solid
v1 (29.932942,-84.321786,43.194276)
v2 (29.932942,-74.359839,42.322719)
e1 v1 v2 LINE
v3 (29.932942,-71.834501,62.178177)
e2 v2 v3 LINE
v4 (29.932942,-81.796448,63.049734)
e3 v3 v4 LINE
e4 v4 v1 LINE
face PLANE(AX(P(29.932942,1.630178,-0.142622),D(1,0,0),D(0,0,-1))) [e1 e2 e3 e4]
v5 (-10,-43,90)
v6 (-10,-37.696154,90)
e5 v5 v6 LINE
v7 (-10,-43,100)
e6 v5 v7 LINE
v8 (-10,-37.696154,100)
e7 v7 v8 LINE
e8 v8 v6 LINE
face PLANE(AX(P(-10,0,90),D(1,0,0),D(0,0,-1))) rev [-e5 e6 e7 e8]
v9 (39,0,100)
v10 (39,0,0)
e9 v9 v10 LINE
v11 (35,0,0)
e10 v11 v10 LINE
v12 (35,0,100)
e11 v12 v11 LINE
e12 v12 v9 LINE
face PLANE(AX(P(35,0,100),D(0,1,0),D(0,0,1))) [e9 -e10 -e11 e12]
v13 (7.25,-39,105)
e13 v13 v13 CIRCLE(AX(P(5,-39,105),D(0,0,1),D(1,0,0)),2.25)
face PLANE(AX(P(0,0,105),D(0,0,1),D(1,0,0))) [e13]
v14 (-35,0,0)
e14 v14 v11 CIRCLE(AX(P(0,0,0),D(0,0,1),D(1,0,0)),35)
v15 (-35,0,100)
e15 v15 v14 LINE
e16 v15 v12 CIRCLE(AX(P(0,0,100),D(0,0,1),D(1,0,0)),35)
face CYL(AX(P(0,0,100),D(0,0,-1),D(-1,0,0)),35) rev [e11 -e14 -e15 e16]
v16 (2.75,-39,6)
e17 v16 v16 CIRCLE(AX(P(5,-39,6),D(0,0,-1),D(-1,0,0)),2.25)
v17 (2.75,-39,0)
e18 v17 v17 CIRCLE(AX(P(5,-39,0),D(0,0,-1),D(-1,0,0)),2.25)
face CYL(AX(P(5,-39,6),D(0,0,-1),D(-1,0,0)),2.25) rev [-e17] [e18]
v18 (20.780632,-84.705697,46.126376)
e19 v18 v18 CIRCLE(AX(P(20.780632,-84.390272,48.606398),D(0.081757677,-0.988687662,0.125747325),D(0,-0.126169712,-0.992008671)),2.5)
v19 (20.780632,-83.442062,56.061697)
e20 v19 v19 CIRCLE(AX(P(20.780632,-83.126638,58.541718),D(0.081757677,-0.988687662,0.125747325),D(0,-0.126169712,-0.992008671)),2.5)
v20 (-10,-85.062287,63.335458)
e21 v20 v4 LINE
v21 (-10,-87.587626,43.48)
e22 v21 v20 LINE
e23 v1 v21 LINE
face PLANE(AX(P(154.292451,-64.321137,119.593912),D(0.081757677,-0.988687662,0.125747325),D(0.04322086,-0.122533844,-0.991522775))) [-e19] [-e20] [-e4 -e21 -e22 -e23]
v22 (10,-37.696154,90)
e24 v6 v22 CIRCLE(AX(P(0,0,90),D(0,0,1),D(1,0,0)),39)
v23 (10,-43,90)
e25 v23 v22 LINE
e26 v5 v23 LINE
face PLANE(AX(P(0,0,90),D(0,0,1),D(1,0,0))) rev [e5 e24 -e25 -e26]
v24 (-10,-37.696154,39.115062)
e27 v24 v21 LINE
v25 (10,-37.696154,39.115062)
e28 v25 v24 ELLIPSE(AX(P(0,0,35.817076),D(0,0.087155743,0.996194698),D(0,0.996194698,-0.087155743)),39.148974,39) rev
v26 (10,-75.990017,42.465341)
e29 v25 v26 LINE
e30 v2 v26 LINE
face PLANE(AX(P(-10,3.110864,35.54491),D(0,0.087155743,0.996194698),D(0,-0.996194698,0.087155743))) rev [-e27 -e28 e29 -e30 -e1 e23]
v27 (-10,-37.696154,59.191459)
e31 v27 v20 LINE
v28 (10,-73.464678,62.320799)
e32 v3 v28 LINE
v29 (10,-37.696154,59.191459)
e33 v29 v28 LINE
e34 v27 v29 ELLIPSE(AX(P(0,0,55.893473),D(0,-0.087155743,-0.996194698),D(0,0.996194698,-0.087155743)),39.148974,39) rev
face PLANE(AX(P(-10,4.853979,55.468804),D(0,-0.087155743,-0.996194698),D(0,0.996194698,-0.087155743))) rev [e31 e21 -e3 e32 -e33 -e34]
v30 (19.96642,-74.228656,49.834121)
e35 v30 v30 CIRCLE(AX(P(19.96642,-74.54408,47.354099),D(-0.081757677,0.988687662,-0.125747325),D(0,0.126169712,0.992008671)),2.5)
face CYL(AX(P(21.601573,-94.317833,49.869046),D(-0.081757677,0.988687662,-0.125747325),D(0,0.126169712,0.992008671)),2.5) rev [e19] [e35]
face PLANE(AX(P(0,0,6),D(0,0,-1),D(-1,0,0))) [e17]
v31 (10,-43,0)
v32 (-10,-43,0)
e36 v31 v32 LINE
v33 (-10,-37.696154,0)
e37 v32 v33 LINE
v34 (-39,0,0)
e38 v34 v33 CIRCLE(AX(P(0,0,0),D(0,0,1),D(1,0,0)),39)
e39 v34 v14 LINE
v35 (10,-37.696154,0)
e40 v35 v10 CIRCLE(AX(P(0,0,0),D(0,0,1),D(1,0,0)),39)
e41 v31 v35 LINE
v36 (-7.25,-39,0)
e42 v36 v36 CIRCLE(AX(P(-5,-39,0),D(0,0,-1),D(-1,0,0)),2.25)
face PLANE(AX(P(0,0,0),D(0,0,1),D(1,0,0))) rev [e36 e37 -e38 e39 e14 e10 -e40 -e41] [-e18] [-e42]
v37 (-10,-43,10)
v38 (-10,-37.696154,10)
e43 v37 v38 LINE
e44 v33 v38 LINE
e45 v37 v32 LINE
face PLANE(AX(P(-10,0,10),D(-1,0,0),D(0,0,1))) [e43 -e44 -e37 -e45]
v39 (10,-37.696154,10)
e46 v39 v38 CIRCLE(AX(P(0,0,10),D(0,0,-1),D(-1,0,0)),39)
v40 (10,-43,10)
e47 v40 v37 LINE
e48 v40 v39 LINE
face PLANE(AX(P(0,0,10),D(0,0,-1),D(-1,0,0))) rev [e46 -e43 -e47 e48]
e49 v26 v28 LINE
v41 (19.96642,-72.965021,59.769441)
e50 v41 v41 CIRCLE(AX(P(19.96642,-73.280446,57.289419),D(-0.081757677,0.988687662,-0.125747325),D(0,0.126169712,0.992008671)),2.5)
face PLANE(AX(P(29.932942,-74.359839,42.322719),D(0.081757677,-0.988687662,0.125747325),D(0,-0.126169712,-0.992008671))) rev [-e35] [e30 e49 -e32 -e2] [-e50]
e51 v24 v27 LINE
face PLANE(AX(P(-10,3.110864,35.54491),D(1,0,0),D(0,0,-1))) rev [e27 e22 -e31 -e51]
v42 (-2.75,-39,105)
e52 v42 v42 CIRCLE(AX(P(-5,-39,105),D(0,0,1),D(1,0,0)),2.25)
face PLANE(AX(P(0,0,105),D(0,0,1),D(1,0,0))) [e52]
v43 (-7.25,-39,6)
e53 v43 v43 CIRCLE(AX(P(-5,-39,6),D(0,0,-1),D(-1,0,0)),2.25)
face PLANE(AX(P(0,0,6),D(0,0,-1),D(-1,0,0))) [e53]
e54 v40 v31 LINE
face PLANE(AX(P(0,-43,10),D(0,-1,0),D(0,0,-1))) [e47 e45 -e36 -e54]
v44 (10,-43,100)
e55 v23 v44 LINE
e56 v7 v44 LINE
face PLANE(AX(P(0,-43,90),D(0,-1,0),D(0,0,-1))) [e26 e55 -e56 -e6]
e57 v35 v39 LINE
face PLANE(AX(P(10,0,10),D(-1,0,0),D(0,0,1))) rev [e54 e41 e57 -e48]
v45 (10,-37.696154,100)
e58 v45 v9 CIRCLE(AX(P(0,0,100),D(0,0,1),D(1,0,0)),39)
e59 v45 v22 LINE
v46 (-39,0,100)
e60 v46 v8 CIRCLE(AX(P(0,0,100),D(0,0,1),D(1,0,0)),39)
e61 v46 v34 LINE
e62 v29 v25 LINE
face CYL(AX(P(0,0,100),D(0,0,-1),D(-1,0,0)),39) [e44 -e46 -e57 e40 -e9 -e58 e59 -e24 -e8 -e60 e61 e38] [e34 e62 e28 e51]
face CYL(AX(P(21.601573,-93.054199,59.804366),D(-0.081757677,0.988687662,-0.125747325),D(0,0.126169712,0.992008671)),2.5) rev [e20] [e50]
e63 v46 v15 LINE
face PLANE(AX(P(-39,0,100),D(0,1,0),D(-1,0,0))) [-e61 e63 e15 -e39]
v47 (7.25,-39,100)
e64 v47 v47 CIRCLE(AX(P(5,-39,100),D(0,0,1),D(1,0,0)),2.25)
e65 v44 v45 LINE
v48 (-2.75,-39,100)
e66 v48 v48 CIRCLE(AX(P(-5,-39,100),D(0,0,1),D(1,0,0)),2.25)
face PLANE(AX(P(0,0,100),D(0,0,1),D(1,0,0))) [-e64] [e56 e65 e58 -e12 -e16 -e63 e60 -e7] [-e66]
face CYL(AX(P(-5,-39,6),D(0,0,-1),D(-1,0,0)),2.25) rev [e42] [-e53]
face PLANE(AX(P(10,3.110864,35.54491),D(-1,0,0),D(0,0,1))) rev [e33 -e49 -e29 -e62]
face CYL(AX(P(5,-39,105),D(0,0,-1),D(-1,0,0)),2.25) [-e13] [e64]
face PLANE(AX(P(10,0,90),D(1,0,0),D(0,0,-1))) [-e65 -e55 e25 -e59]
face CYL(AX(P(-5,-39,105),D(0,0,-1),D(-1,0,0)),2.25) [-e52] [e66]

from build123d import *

# Parameters (mm, degrees)
EXTRUDE_THIN1_DEPTH       = 100
BOSS_EXTRUDE1_START       = -10
BOSS_EXTRUDE1_DEPTH       = 10
SKETCH3_R                 = 2.25
BOSS_EXTRUDE2_DEPTH       = 5
BOSS_EXTRUDE3_DEPTH       = 10
SKETCH5_R                 = 2.25
CUT_EXTRUDE1_DEPTH        = 6
BOSS_EXTRUDE4_REACH       = 121.416
BOSS_EXTRUDE4_END_RADIUS  = 39
SKETCH10_W                = 20
SKETCH10_H                = 20
BOSS_EXTRUDE5_START       = -39.491913729
BOSS_EXTRUDE5_OUTLINE_W   = 20
BOSS_EXTRUDE5_OUTLINE_H   = 20
BOSS_EXTRUDE5_DEPTH       = 39.491913729
BOSS_EXTRUDE5_START_2     = 91.246721786
BOSS_EXTRUDE5_2_OUTLINE_W = 23
BOSS_EXTRUDE5_2_OUTLINE_H = 23
BOSS_EXTRUDE5_2_DEPTH     = 3.753278214
BOSS_EXTRUDE6_DEPTH       = 20
SKETCH12_R                = 2.5
CUT_EXTRUDE2_DEPTH        = 20


with BuildPart() as part:
    # Sketch1 → Extrude-Thin1 (new body)
    with BuildSketch(Plane.XY):
        with BuildLine():
            ThreePointArc((-35, 0), (0, -35), (35, 0))
            Line((35, 0), (39, 0))
            ThreePointArc((39, 0), (0, -39), (-39, 0))
            Line((-39, 0), (-35, 0))
        make_face()
    extrude(amount=EXTRUDE_THIN1_DEPTH)

    # Sketch2 → Boss-Extrude1 (add)
    with BuildSketch(Plane.XY.offset(100).offset(BOSS_EXTRUDE1_START)):
        with BuildLine():
            Line((0, -39), (0, -35))
            Line((0, -35), (-10, -35))
            Line((-10, -35), (-10, -37.69615365))
            ThreePointArc((-10, -37.69615365), (-5.042321274, -38.672664715), (0, -39))
        make_face()
        with BuildLine():
            Line((10, -35), (0, -35))
            Line((0, -35), (0, -39))
            ThreePointArc((0, -39), (5.042321274, -38.672664715), (10, -37.69615365))
            Line((10, -37.69615365), (10, -35))
        make_face()
        with BuildLine():
            ThreePointArc((10, -37.69615365), (5.042321274, -38.672664715), (0, -39))
            ThreePointArc((0, -39), (-5.042321274, -38.672664715), (-10, -37.69615365))
            Line((-10, -37.69615365), (-10, -43))
            Line((-10, -43), (10, -43))
            Line((10, -43), (10, -37.69615365))
        make_face()
    extrude(amount=BOSS_EXTRUDE1_DEPTH)

    # Sketch3 → Boss-Extrude2 (add)
    with BuildSketch(Plane.XY.offset(100)):
        with Locations((-5, -39)):
            Circle(SKETCH3_R)
        with Locations((5, -39)):
            Circle(SKETCH3_R)
    extrude(amount=BOSS_EXTRUDE2_DEPTH)

    # Sketch4 → Boss-Extrude3 (add)
    with BuildSketch(Plane(origin=(0, 0, 0), x_dir=(-1, 0, 0), z_dir=(0, 0, -1))):
        with BuildLine():
            Line((0, -39), (0, -35))
            Line((0, -35), (-10, -35))
            Line((-10, -35), (-10, -37.69615365))
            ThreePointArc((-10, -37.69615365), (-5.042321274, -38.672664715), (0, -39))
        make_face()
        with BuildLine():
            ThreePointArc((10, -37.69615365), (5.042321274, -38.672664715), (0, -39))
            ThreePointArc((0, -39), (-5.042321274, -38.672664715), (-10, -37.69615365))
            Line((-10, -37.69615365), (-10, -43))
            Line((-10, -43), (10, -43))
            Line((10, -43), (10, -37.69615365))
        make_face()
        with BuildLine():
            Line((10, -35), (0, -35))
            Line((0, -35), (0, -39))
            ThreePointArc((0, -39), (5.042321274, -38.672664715), (10, -37.69615365))
            Line((10, -37.69615365), (10, -35))
        make_face()
    extrude(amount=-BOSS_EXTRUDE3_DEPTH)

    # Sketch5 → Cut-Extrude1 (cut)
    with BuildSketch(Plane(origin=(0, 0, 0), x_dir=(-1, 0, 0), z_dir=(0, 0, -1))):
        with Locations(Location((-5, -39, 0), (0, 0, 180))):
            Circle(SKETCH5_R)
        with Locations(Location((5, -39, 0), (0, 0, 180))):
            Circle(SKETCH5_R)
    extrude(amount=-CUT_EXTRUDE1_DEPTH, mode=Mode.SUBTRACT)

    # Boss-Extrude4: up to this cylinder (the profile starts outside it)
    boss_extrude4_end = Plane(origin=(0, 0, 50), z_dir=(0, 0, -1)) * Cylinder(BOSS_EXTRUDE4_END_RADIUS, 321.832, mode=Mode.PRIVATE)
    # Sketch10 → Boss-Extrude4 (add, up to the surface)
    with BuildSketch(Plane(origin=(0, -51.355775573, 4.493048169), x_dir=(1, 0, 0), z_dir=(0, 0.9961946980917462, -0.08715574274765152)), mode=Mode.PRIVATE) as boss_extrude4_sk1:
        with Locations((0, -45.680780994)):
            Rectangle(SKETCH10_W, SKETCH10_H)
    boss_extrude4_tool1 = extrude(boss_extrude4_sk1.sketch, amount=BOSS_EXTRUDE4_REACH, mode=Mode.PRIVATE) - boss_extrude4_end
    add(boss_extrude4_tool1.solids().sort_by_distance((0, -47.374433, 50))[0])

    # Boss-Extrude5: read off the stored shape, not the designer's step
    # Boss-Extrude5 outline → Boss-Extrude5 (add)
    with BuildSketch(Plane(origin=(0, -51.355775573, 4.493048169), x_dir=(1, 0, 0), z_dir=(0, 0.9961946980917462, -0.08715574274765152)).offset(BOSS_EXTRUDE5_START)):
        with Locations((0, -45.680780994)):
            Rectangle(BOSS_EXTRUDE5_OUTLINE_W, BOSS_EXTRUDE5_OUTLINE_H)
    extrude(amount=BOSS_EXTRUDE5_DEPTH)

    # Boss-Extrude5 2 outline → Boss-Extrude5 2 (cut)
    with BuildSketch(Plane(origin=(0, 0, 0), x_dir=(0.9966522374056314, 0.08110432407614805, -0.01031534248099727), z_dir=(0.08175767654690974, -0.9886876617314986, 0.12574732548071507)).offset(BOSS_EXTRUDE5_START_2)):
        with Locations((-7.5, 42.5)):
            Rectangle(BOSS_EXTRUDE5_2_OUTLINE_W, BOSS_EXTRUDE5_2_OUTLINE_H)
    extrude(amount=BOSS_EXTRUDE5_2_DEPTH, mode=Mode.SUBTRACT)

    # Sketch11 → Boss-Extrude6 (add, along a direction that is not the sketch's normal)
    with BuildSketch(Plane(origin=(10, 0, 0), x_dir=(0, 0, -1), z_dir=(1, 0, 0))):
        Polygon((-63.192356491, -83.426625408), (-43.336898209, -85.951963664), (-42.465340782, -75.990016683), (-62.320799064, -73.464678427), align=None)
    extrude(amount=BOSS_EXTRUDE6_DEPTH, dir=(0.9966471031139101, 0.0815088903864268, -0.007131103885417095))

    # Sketch12 → Cut-Extrude2 (cut)
    with BuildSketch(Plane(origin=(6.645907522, -80.368315802, 10.221732461), x_dir=(0.9966522374056314, 0.08110432407614805, -0.010315342480997362), z_dir=(-0.08175767654690974, 0.9886876617314985, -0.12574732548071624))):
        with Locations(Location((13.36525587, -47.585828212, 0), (0, 0, 270))):
            Circle(SKETCH12_R)
        with Locations(Location((13.36525587, -37.57047174, 0), (0, 0, 270))):
            Circle(SKETCH12_R)
    extrude(amount=-CUT_EXTRUDE2_DEPTH, mode=Mode.SUBTRACT)


solid = part.part
